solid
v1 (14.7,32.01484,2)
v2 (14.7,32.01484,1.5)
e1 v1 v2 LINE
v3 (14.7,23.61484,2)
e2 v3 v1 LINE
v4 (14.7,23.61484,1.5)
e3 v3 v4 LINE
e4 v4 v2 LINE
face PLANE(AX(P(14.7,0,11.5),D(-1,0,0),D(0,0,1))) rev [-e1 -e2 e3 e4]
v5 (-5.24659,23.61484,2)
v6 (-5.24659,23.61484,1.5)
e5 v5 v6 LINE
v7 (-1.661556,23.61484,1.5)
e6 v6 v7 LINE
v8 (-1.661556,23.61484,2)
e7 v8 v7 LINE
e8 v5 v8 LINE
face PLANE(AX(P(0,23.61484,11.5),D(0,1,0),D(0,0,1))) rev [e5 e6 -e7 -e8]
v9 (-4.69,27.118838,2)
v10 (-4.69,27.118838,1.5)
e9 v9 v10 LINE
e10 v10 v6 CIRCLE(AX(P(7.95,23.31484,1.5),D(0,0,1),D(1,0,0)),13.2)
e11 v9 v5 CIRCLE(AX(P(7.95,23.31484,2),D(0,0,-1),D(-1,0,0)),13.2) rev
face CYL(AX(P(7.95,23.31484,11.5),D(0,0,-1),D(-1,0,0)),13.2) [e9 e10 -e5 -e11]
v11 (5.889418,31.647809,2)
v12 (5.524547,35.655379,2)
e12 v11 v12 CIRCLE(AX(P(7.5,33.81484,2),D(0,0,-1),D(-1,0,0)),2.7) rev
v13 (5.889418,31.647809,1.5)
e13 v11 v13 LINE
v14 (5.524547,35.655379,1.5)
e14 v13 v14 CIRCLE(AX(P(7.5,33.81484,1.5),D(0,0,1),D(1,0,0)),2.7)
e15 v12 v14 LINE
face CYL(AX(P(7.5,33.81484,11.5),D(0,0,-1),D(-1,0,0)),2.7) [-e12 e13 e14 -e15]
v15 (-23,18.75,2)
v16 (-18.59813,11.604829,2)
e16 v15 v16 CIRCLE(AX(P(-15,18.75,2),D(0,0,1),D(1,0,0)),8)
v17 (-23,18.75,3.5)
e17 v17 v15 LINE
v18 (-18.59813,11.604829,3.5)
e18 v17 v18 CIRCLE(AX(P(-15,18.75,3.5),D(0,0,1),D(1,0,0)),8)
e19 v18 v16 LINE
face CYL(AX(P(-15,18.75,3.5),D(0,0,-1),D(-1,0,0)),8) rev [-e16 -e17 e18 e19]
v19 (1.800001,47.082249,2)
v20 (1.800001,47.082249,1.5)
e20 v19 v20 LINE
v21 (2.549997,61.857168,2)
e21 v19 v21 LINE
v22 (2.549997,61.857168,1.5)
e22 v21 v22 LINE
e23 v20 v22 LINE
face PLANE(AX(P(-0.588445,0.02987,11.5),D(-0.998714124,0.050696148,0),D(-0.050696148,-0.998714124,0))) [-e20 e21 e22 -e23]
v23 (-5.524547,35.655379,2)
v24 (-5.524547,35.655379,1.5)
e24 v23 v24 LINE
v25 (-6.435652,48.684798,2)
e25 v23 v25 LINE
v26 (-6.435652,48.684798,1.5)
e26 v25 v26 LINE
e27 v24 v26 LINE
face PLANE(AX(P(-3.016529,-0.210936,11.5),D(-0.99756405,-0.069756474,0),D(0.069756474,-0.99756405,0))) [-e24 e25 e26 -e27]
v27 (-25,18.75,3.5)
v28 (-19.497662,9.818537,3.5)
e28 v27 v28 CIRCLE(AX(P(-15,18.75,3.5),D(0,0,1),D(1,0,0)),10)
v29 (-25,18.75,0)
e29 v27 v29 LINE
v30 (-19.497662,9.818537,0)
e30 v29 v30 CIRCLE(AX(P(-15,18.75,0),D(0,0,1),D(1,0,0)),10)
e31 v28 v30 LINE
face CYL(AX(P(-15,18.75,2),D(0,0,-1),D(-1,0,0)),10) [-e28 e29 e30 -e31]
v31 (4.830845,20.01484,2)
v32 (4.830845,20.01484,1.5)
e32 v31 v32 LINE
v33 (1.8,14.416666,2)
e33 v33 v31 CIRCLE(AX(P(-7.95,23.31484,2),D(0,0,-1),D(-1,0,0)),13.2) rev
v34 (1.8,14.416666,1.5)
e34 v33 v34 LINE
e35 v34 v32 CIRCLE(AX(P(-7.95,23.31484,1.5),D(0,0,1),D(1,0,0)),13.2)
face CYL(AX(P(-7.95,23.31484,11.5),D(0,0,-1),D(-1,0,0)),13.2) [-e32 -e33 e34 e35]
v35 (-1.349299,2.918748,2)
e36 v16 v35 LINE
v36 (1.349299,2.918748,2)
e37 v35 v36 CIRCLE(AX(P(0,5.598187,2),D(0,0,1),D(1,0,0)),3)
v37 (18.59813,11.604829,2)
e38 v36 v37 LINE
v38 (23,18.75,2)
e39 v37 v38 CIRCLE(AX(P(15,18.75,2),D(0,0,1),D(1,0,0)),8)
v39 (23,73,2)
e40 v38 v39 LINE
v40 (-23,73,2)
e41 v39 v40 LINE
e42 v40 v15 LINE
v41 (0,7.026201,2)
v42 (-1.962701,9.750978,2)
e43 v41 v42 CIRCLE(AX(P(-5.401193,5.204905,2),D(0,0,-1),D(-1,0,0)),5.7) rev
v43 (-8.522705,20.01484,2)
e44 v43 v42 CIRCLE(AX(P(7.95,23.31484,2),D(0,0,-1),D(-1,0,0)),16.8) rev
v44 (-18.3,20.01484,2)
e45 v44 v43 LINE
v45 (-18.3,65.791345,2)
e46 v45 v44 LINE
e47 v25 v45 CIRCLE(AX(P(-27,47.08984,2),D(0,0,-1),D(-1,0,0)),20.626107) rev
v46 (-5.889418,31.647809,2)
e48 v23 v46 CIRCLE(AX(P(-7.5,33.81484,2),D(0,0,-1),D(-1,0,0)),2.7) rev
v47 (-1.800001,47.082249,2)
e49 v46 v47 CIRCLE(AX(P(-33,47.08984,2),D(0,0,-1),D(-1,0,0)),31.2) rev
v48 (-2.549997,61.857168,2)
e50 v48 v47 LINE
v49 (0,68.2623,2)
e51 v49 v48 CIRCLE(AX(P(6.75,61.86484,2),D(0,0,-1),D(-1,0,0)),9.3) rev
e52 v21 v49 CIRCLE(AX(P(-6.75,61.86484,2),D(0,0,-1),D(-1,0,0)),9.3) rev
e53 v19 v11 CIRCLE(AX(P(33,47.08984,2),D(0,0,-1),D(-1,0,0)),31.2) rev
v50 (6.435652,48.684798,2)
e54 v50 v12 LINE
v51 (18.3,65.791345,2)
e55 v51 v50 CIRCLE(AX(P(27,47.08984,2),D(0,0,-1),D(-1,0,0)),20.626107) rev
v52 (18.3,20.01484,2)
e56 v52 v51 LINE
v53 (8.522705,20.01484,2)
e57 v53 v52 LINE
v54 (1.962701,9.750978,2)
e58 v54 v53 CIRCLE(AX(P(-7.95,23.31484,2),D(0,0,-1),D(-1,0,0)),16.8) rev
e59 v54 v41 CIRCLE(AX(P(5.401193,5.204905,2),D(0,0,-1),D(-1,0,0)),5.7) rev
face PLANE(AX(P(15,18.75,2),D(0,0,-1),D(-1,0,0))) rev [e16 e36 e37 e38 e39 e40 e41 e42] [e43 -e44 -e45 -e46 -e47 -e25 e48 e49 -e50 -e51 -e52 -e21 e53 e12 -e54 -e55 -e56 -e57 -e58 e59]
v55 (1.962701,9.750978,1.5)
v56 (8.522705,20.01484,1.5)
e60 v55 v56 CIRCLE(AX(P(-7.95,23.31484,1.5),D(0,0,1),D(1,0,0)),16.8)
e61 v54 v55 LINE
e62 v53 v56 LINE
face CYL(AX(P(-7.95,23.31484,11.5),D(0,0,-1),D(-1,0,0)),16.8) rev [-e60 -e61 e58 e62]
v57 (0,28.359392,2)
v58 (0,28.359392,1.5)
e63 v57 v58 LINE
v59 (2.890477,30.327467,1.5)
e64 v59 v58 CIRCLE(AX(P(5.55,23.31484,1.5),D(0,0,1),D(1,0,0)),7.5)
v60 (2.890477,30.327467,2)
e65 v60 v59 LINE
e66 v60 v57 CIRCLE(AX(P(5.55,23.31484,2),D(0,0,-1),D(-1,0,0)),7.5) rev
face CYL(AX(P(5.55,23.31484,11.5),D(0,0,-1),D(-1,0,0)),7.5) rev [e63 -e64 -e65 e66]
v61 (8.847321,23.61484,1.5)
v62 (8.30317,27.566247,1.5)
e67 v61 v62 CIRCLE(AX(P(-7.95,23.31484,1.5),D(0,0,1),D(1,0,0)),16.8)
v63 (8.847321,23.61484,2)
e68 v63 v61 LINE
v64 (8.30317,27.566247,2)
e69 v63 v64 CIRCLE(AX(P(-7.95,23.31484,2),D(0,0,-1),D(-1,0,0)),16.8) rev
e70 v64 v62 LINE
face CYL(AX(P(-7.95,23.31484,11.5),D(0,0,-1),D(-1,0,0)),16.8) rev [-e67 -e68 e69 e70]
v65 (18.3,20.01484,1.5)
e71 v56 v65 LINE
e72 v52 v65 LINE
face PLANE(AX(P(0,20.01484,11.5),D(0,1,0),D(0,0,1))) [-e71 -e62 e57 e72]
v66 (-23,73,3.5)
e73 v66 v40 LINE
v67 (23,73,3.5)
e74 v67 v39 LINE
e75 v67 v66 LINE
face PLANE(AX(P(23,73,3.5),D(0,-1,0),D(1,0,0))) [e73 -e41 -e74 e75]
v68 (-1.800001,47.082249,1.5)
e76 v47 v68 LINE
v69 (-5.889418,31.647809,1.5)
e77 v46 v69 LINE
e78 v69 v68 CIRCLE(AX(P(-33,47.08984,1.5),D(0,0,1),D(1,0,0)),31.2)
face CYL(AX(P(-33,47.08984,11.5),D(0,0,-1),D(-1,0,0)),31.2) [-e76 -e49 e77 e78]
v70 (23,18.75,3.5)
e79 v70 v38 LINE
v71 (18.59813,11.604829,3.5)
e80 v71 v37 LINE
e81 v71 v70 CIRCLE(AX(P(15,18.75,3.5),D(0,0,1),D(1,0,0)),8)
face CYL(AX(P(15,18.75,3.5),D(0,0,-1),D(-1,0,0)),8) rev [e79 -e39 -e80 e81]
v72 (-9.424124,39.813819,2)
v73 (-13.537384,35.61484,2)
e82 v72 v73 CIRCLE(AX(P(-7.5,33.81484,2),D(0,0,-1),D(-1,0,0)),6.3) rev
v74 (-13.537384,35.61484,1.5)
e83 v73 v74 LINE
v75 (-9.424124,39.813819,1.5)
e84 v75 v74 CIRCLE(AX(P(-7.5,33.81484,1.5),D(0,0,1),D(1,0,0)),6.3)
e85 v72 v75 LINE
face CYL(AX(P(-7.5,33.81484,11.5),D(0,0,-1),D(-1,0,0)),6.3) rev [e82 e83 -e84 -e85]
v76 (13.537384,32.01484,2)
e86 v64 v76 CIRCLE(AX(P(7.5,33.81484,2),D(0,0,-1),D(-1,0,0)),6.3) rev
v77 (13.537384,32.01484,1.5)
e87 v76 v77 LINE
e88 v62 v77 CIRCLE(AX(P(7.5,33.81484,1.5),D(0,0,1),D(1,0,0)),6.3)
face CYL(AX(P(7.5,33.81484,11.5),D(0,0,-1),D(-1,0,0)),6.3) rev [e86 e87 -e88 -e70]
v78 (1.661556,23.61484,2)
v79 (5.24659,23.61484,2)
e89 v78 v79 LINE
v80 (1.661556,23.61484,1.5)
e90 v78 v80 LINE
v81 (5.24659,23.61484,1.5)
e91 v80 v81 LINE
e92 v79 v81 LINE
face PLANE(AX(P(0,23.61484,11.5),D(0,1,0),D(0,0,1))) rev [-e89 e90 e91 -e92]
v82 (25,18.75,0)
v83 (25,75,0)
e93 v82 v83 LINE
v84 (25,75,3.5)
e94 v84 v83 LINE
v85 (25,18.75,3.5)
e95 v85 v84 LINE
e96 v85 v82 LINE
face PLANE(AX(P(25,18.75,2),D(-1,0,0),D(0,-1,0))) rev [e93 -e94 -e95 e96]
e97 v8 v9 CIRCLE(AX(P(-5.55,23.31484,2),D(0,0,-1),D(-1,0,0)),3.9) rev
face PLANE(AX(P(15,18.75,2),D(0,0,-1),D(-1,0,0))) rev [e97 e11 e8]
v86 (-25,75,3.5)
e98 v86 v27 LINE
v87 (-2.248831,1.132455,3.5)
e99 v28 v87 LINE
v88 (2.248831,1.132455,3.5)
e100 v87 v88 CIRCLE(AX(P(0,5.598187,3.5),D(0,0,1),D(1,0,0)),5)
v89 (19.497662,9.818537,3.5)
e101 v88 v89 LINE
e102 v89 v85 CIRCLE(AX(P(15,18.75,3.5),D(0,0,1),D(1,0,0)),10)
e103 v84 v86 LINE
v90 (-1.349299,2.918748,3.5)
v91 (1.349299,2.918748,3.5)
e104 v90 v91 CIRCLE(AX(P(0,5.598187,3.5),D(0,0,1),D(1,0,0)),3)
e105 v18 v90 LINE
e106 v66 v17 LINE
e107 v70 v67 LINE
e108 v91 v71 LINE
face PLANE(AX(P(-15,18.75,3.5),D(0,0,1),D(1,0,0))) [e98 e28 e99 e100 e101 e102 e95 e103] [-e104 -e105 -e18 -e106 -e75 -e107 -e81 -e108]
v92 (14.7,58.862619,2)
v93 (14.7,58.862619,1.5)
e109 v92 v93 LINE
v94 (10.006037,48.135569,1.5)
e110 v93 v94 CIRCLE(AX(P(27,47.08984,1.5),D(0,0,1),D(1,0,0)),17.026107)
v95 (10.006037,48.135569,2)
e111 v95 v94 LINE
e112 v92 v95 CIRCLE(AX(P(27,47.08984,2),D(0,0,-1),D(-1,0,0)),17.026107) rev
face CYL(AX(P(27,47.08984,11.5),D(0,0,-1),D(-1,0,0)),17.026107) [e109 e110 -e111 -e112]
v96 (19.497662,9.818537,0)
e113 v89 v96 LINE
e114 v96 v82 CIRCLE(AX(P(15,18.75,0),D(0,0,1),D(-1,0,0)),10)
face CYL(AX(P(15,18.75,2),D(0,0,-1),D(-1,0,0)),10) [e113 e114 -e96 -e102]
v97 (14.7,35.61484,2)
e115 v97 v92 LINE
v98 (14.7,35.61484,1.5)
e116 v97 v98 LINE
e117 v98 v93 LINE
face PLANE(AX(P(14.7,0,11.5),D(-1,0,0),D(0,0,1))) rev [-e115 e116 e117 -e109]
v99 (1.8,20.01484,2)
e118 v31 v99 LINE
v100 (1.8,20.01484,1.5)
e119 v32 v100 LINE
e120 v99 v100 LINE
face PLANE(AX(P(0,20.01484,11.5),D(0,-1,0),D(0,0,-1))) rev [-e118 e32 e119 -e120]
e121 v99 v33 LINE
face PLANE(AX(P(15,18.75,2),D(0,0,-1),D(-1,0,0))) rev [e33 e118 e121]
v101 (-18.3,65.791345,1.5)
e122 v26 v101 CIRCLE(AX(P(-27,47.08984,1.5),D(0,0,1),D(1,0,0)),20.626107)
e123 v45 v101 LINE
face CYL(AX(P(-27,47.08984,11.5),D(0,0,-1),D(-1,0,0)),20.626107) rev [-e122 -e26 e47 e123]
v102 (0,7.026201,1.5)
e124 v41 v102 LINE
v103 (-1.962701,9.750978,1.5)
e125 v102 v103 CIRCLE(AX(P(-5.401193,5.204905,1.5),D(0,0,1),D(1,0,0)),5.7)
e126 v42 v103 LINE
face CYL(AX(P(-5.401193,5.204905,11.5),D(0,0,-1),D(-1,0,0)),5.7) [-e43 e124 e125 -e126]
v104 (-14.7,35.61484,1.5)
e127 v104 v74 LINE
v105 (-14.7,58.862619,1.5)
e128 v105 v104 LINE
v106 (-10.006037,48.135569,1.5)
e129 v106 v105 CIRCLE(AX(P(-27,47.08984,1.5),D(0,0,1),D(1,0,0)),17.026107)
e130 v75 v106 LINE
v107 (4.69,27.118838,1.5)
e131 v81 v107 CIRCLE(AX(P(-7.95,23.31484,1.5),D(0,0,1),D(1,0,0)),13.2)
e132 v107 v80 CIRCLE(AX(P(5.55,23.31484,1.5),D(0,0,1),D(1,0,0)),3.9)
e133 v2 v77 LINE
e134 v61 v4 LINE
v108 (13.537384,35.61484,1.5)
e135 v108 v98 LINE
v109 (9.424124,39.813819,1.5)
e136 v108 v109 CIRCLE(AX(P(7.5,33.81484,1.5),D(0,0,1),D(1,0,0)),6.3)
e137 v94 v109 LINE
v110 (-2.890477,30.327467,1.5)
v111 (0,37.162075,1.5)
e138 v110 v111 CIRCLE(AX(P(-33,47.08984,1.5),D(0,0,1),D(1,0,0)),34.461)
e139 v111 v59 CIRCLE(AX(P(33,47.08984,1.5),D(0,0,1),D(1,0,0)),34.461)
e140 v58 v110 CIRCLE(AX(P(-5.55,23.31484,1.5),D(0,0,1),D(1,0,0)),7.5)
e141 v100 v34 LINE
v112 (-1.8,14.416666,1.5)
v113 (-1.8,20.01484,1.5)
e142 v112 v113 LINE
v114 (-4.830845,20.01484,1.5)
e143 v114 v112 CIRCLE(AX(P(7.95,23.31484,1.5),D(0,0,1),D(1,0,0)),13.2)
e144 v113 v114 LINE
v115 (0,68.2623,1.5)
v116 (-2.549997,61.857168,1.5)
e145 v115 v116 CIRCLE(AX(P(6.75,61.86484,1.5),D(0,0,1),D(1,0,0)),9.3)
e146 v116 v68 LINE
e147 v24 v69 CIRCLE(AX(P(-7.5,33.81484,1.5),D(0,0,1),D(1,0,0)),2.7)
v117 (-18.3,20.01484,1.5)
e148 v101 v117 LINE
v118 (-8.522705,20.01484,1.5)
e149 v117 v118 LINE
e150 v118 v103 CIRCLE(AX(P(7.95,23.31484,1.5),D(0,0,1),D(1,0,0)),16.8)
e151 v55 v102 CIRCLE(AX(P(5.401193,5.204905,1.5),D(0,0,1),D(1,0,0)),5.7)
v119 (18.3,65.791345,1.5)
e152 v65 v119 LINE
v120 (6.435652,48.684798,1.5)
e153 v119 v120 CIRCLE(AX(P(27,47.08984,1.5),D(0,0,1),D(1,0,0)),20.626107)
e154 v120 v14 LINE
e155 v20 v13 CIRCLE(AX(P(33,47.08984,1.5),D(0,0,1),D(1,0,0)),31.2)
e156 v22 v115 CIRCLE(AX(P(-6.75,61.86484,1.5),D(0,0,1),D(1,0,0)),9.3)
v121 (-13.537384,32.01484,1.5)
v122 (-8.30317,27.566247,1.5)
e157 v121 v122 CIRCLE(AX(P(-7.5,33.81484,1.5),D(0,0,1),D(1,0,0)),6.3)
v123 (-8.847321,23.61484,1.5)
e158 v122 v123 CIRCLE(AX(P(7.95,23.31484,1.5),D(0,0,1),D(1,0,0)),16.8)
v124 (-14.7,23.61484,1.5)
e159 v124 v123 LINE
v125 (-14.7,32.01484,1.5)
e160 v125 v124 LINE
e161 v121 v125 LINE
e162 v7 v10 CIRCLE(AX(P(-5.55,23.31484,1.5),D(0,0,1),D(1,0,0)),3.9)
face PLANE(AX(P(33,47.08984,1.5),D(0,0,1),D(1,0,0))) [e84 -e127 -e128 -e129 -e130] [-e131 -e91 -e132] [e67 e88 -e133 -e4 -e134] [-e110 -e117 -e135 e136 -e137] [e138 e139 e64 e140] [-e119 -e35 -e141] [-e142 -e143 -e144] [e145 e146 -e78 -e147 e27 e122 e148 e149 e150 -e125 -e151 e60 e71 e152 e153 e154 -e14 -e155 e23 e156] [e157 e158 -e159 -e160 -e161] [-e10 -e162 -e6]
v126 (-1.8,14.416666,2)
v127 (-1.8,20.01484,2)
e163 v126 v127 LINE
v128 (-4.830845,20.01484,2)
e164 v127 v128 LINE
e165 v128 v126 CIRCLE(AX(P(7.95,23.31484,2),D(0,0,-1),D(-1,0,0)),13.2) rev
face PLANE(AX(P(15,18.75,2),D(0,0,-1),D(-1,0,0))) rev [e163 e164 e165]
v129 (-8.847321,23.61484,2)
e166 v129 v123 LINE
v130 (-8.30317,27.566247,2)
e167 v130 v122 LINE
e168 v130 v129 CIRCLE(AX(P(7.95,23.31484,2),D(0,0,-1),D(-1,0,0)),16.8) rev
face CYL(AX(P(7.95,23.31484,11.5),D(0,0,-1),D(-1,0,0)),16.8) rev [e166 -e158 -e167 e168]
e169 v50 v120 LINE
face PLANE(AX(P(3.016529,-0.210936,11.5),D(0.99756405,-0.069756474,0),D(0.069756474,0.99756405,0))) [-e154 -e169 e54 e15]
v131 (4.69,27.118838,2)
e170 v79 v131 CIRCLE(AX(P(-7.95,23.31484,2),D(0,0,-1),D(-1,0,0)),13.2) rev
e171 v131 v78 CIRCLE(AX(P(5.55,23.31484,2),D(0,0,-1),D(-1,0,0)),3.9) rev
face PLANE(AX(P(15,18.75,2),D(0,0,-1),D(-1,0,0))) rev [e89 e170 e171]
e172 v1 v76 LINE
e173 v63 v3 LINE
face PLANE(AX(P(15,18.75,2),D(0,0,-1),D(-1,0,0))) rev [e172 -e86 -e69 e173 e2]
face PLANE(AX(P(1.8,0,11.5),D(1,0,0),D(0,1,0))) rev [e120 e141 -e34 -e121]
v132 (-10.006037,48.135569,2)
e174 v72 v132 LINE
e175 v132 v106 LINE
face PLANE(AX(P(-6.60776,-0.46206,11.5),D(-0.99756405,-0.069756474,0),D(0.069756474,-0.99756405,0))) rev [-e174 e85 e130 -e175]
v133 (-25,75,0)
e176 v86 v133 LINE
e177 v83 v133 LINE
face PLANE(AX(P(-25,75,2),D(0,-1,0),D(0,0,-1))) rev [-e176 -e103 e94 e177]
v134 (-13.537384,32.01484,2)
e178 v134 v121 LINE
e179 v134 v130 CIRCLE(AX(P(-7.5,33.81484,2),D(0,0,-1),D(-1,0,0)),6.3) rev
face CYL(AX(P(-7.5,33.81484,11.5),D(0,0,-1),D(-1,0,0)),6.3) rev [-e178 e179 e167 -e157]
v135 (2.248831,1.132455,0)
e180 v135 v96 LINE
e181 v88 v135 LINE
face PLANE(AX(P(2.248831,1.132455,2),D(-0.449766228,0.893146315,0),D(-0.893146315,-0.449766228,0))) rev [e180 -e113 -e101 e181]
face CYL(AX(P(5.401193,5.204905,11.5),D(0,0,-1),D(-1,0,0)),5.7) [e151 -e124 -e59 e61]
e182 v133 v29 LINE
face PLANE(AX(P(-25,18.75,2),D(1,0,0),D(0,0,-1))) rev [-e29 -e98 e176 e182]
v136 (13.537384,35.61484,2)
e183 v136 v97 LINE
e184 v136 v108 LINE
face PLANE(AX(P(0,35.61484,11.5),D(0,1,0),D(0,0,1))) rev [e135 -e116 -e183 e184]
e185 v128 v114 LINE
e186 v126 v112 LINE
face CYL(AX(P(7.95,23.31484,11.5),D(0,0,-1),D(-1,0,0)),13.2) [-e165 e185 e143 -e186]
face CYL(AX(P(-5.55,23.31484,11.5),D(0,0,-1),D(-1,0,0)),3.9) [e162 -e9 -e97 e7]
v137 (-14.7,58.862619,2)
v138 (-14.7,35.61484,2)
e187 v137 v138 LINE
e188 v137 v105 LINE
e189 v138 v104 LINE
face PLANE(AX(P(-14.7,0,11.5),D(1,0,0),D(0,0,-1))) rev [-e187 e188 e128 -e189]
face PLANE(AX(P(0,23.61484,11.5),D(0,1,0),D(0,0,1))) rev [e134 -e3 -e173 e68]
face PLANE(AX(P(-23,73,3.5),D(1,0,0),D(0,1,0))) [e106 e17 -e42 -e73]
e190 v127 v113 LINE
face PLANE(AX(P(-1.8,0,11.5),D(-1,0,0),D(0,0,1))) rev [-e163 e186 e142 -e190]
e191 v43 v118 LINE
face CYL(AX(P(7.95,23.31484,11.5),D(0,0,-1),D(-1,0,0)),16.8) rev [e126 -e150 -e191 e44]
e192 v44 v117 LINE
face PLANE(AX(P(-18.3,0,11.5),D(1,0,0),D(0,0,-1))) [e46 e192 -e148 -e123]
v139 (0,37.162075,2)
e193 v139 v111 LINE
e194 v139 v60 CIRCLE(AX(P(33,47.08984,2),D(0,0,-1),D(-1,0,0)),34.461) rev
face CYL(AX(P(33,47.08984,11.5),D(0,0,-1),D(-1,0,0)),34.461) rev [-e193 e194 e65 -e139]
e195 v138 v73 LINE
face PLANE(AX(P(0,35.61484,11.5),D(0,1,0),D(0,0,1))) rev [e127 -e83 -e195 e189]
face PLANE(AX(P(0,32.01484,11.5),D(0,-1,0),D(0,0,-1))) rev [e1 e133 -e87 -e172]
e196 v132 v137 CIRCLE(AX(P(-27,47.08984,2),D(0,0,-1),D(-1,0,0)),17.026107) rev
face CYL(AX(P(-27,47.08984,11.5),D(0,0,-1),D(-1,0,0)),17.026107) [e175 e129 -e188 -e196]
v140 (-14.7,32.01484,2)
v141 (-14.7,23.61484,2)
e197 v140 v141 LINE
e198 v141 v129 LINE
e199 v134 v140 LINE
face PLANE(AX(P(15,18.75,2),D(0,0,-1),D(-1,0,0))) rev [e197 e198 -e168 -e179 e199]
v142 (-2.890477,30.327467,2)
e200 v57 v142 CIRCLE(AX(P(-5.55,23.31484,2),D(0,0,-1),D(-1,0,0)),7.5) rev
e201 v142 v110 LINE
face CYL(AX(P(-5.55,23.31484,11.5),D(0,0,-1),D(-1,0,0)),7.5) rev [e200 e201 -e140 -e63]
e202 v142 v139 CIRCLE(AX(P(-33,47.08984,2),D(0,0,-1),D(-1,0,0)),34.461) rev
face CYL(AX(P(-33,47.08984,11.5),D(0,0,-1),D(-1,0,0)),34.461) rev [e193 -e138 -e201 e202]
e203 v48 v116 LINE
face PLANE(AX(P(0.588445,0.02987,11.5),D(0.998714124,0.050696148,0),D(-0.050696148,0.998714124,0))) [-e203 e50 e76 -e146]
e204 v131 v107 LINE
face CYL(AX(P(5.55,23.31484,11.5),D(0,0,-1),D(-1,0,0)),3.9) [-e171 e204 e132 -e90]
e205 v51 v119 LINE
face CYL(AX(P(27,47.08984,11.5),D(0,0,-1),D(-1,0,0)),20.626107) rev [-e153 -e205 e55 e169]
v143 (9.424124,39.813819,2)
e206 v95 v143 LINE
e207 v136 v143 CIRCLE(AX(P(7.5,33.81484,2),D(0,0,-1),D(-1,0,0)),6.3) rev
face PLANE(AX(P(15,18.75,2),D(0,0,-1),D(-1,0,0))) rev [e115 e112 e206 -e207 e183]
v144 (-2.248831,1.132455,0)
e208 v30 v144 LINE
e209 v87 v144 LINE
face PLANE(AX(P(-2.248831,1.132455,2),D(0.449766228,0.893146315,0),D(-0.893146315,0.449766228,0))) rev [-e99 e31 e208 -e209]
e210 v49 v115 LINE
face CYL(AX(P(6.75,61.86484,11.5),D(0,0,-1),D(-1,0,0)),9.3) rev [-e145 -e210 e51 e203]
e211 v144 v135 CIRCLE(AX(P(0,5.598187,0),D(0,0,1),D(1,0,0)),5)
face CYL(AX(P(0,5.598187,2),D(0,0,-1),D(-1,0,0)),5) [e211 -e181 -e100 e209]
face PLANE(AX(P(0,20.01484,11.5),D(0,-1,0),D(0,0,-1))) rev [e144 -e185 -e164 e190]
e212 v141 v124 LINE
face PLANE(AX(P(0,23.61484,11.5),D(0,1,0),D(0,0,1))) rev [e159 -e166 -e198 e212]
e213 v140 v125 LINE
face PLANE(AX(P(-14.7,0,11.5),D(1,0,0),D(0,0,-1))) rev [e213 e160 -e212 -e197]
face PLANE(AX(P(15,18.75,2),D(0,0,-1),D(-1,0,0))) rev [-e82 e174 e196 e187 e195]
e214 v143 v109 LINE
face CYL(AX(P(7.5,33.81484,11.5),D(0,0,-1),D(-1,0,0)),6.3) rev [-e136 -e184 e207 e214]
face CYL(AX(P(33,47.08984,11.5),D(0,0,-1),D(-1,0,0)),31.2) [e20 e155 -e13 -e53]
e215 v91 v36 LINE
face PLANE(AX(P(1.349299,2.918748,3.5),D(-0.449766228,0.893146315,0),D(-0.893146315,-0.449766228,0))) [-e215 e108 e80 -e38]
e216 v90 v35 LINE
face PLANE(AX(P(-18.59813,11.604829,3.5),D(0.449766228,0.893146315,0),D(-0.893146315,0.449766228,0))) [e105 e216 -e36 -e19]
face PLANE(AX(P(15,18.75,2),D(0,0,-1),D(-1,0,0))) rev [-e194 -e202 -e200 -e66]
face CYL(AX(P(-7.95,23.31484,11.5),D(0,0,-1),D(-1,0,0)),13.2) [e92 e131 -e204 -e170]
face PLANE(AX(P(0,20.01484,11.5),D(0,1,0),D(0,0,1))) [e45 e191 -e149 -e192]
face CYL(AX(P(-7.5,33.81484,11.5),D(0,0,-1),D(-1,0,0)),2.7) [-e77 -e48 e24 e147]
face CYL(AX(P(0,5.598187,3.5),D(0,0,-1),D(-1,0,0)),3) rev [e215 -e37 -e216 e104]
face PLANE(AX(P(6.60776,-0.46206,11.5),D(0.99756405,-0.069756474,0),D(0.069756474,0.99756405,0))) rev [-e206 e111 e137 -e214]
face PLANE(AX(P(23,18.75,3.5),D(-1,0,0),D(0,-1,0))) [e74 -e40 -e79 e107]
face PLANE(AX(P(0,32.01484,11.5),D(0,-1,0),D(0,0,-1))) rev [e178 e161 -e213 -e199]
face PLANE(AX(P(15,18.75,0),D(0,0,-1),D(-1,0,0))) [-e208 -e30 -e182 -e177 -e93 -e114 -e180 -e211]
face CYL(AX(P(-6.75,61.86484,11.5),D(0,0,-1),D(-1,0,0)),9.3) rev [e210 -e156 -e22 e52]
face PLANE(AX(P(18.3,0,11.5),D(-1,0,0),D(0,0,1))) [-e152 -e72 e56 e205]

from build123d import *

# Parameters (mm, degrees)
EXTRUDE_1_DEPTH     = 2
EXTRUDE_2_DEPTH     = 1.5
OTHER_START         = 1.5
OTHER_1_DEPTH       = 0.5
CUT_EXTRUDE_1_DEPTH = 10


# Read off the part's stored shape, not the designer's step: Полость1
with BuildPart() as part:
    # Эскиз1 → Бобышка-Вытянуть1 (new body)
    with BuildSketch(Plane.XY):
        with BuildLine():
            Line((-2.248831138, 1.132455321), (-19.497662275, 9.818536847))
            ThreePointArc((-19.497662275, 9.818536847), (-23.514006776, 13.504841411), (-25, 18.75))
            Line((-25, 18.75), (-25, 75))
            Line((-25, 75), (25, 75))
            Line((25, 75), (25, 18.75))
            ThreePointArc((25, 18.75), (23.514006776, 13.504841411), (19.497662275, 9.818536847))
            Line((19.497662275, 9.818536847), (2.248831138, 1.132455321))
            ThreePointArc((2.248831138, 1.132455321), (0, 0.598186897), (-2.248831138, 1.132455321))
        make_face()
    extrude(amount=EXTRUDE_1_DEPTH)

    # Эскиз2 → Бобышка-Вытянуть2 (add)
    with BuildSketch(Plane.XY.offset(2)):
        with BuildLine():
            Line((25, 75), (-25, 75))
            Line((-25, 75), (-25, 18.75))
            ThreePointArc((-25, 18.75), (-23.514006776, 13.504841411), (-19.497662275, 9.818536847))
            Line((-19.497662275, 9.818536847), (-2.248831138, 1.132455321))
            ThreePointArc((-2.248831138, 1.132455321), (0, 0.598186897), (2.248831138, 1.132455321))
            Line((2.248831138, 1.132455321), (19.497662275, 9.818536847))
            ThreePointArc((19.497662275, 9.818536847), (23.514006776, 13.504841411), (25, 18.75))
            Line((25, 18.75), (25, 75))
        make_face()
        with BuildLine():
            Line((23, 73), (-23, 73))
            Line((-23, 73), (-23, 18.75))
            ThreePointArc((-23, 18.75), (-21.81120542, 14.553873129), (-18.59812982, 11.604829477))
            Line((-18.59812982, 11.604829477), (-1.349298683, 2.918747951))
            ThreePointArc((-1.349298683, 2.918747951), (0, 2.598186897), (1.349298683, 2.918747951))
            Line((1.349298683, 2.918747951), (18.59812982, 11.604829477))
            ThreePointArc((18.59812982, 11.604829477), (21.81120542, 14.553873129), (23, 18.75))
            Line((23, 18.75), (23, 73))
        make_face(mode=Mode.SUBTRACT)
    extrude(amount=EXTRUDE_2_DEPTH)

    # Полость1 outline → Полость1 (cut)
    with BuildSketch(Plane.XY.offset(OTHER_START)):
        with BuildLine():
            ThreePointArc((5.872817683, 36.335212556), (10.497140141, 33.683878279), (5.659180925, 31.446003782))
            ThreePointArc((5.659180925, 31.446003782), (2.557547726, 38.996194393), (1.5, 47.089840022))
            Line((1.5, 47.089840022), (2.25, 61.864840022))
            ThreePointArc((2.25, 61.864840022), (1.66872912, 65.046820537), (0, 67.817780472))
            ThreePointArc((0, 67.817780472), (-1.66872912, 65.046820537), (-2.25, 61.864840022))
            Line((-2.25, 61.864840022), (-1.5, 47.089840022))
            ThreePointArc((-1.5, 47.089840022), (-2.557547726, 38.996194393), (-5.659180925, 31.446003782))
            ThreePointArc((-5.659180925, 31.446003782), (-10.49714014, 33.683878279), (-5.872817683, 36.335212556))
            Line((-5.872817683, 36.335212556), (-6.73484174, 48.66273089))
            ThreePointArc((-6.73484174, 48.66273089), (-10.164455559, 58.47909234), (-18, 65.314840022))
            Line((-18, 65.314840022), (-18, 20.314840022))
            Line((-18, 20.314840022), (-8.27498074, 20.314840022))
            ThreePointArc((-8.27498074, 20.314840022), (-6.018005307, 14.531627185), (-1.78373039, 9.991758821))
            ThreePointArc((-1.78373039, 9.991758821), (-0.762703724, 9.010745514), (0, 7.817780472))
            ThreePointArc((0, 7.817780472), (0.762703724, 9.010745514), (1.78373039, 9.991758821))
            ThreePointArc((1.78373039, 9.991758821), (6.018005307, 14.531627185), (8.27498074, 20.314840022))
            Line((8.27498074, 20.314840022), (18, 20.314840022))
            Line((18, 20.314840022), (18, 65.314840022))
            ThreePointArc((18, 65.314840022), (10.164455559, 58.47909234), (6.73484174, 48.66273089))
            Line((6.73484174, 48.66273089), (5.872817683, 36.335212556))
        make_face()
        with BuildLine():
            ThreePointArc((-1.5, 13.673911644), (-3.833724688, 16.727440499), (-5.212446581, 20.314840022))
            Line((-5.212446581, 20.314840022), (-1.5, 20.314840022))
            Line((-1.5, 20.314840022), (-1.5, 13.673911644))
        make_face(mode=Mode.SUBTRACT)
        with BuildLine():
            ThreePointArc((-7.92032189, 27.82958067), (-8.391822285, 25.594060154), (-8.55, 23.314840022))
            Line((-8.55, 23.314840022), (-15, 23.314840022))
            Line((-15, 23.314840022), (-15, 32.314840022))
            Line((-15, 32.314840022), (-13.309475019, 32.314840022))
            ThreePointArc((-13.309475019, 32.314840022), (-11.338226185, 29.203113691), (-7.92032189, 27.82958067))
        make_face(mode=Mode.SUBTRACT)
        with BuildLine():
            ThreePointArc((-4.896666667, 27.463714033), (-2.35750881, 26.043942439), (-1.35, 23.314840022))
            Line((-1.35, 23.314840022), (-5.55, 23.314840022))
            ThreePointArc((-5.55, 23.314840022), (-5.385666463, 25.414840022), (-4.896666667, 27.463714033))
        make_face(mode=Mode.SUBTRACT)
        with BuildLine():
            Line((1.5, 13.673911644), (1.5, 20.314840022))
            Line((1.5, 20.314840022), (5.212446581, 20.314840022))
            ThreePointArc((5.212446581, 20.314840022), (3.833724688, 16.727440499), (1.5, 13.673911644))
        make_face(mode=Mode.SUBTRACT)
        with BuildLine():
            ThreePointArc((1.35, 23.314840022), (2.35750881, 26.043942439), (4.896666667, 27.463714033))
            ThreePointArc((4.896666667, 27.463714033), (5.385666463, 25.414840022), (5.55, 23.314840022))
            Line((5.55, 23.314840022), (1.35, 23.314840022))
        make_face(mode=Mode.SUBTRACT)
        with BuildLine():
            ThreePointArc((0, 38.259555712), (1.403302974, 34.104361284), (3.327405339, 30.163202817))
            ThreePointArc((3.327405339, 30.163202817), (1.502516133, 29.26949151), (0, 27.901505478))
            ThreePointArc((0, 27.901505478), (-1.502516133, 29.26949151), (-3.327405339, 30.163202817))
            ThreePointArc((-3.327405339, 30.163202817), (-1.403302974, 34.104361284), (0, 38.259555712))
        make_face(mode=Mode.SUBTRACT)
        with BuildLine():
            ThreePointArc((8.55, 23.314840022), (8.391822285, 25.594060154), (7.92032189, 27.82958067))
            ThreePointArc((7.92032189, 27.82958067), (11.338226185, 29.203113691), (13.309475019, 32.314840022))
            Line((13.309475019, 32.314840022), (15, 32.314840022))
            Line((15, 32.314840022), (15, 23.314840022))
            Line((15, 23.314840022), (8.55, 23.314840022))
        make_face(mode=Mode.SUBTRACT)
        with BuildLine():
            ThreePointArc((-9.108112452, 39.595322211), (-11.782030233, 38.017722019), (-13.309475019, 35.314840022))
            Line((-13.309475019, 35.314840022), (-15, 35.314840022))
            Line((-15, 35.314840022), (-15, 59.587599146))
            ThreePointArc((-15, 59.587599146), (-11.277427711, 54.369586152), (-9.706680997, 48.155251207))
            Line((-9.706680997, 48.155251207), (-9.108112452, 39.595322211))
        make_face(mode=Mode.SUBTRACT)
        with BuildLine():
            ThreePointArc((9.706680998, 48.155251207), (11.277427711, 54.369586152), (15, 59.587599146))
            Line((15, 59.587599146), (15, 35.314840022))
            Line((15, 35.314840022), (13.309475019, 35.314840022))
            ThreePointArc((13.309475019, 35.314840022), (11.782030233, 38.017722019), (9.108112452, 39.595322211))
            Line((9.108112452, 39.595322211), (9.706680998, 48.155251207))
        make_face(mode=Mode.SUBTRACT)
    extrude(amount=OTHER_1_DEPTH, mode=Mode.SUBTRACT)

    # Эскиз3 → Вырез-Вытянуть1 (cut)
    with BuildSketch(Plane.XY.offset(1.5)):
        with BuildLine():
            Line((-18.3, 65.79134502), (-18.3, 20.014840022))
            Line((-18.3, 20.014840022), (-8.522704696, 20.014840022))
            ThreePointArc((-8.522704696, 20.014840022), (-6.205709985, 14.267416366), (-1.962700971, 9.75097776))
            ThreePointArc((-1.962700971, 9.75097776), (-0.776140503, 8.53640523), (0, 7.026200576))
            ThreePointArc((0, 7.026200576), (0.776140503, 8.53640523), (1.962700971, 9.75097776))
            ThreePointArc((1.962700971, 9.75097776), (6.205709985, 14.267416366), (8.522704696, 20.014840022))
            Line((8.522704696, 20.014840022), (18.3, 20.014840022))
            Line((18.3, 20.014840022), (18.3, 65.79134502))
            ThreePointArc((18.3, 65.79134502), (10.051283209, 58.844723617), (6.435652247, 48.684797911))
            Line((6.435652247, 48.684797911), (5.524546517, 35.655378948))
            ThreePointArc((5.524546517, 35.655378948), (10.188878559, 34.059650346), (5.889417806, 31.647808643))
            ThreePointArc((5.889417806, 31.647808643), (2.840648904, 39.098998924), (1.800000924, 47.0822489))
            Line((1.800000924, 47.0822489), (2.549996836, 61.857168373))
            ThreePointArc((2.549996836, 61.857168373), (1.8904299, 65.304748617), (0, 68.262300456))
            ThreePointArc((0, 68.262300456), (-1.8904299, 65.304748617), (-2.549996836, 61.857168373))
            Line((-2.549996836, 61.857168373), (-1.800000923, 47.0822489))
            ThreePointArc((-1.800000923, 47.0822489), (-2.840648904, 39.098998924), (-5.889417806, 31.647808643))
            ThreePointArc((-5.889417806, 31.647808643), (-10.188878559, 34.059650346), (-5.524546517, 35.655378948))
            Line((-5.524546517, 35.655378948), (-6.435652247, 48.684797911))
            ThreePointArc((-6.435652247, 48.684797911), (-10.051283209, 58.844723617), (-18.3, 65.79134502))
        make_face()
        with BuildLine():
            Line((-14.7, 58.862618748), (-14.7, 35.614840022))
            Line((-14.7, 35.614840022), (-13.537383539, 35.614840022))
            ThreePointArc((-13.537383539, 35.614840022), (-12.000472829, 38.223438928), (-9.424123799, 39.813818902))
            Line((-9.424123799, 39.813818902), (-10.006037257, 48.13556906))
            ThreePointArc((-10.006037257, 48.13556906), (-11.401876329, 53.915296555), (-14.7, 58.862618748))
        make_face(mode=Mode.SUBTRACT)
        with BuildLine():
            Line((10.006037257, 48.13556906), (9.424123799, 39.813818902))
            ThreePointArc((9.424123799, 39.813818902), (12.000472829, 38.223438928), (13.537383539, 35.614840022))
            Line((13.537383539, 35.614840022), (14.7, 35.614840022))
            Line((14.7, 35.614840022), (14.7, 58.862618748))
            ThreePointArc((14.7, 58.862618748), (11.401876329, 53.915296555), (10.006037257, 48.13556906))
        make_face(mode=Mode.SUBTRACT)
        with BuildLine():
            Line((8.847321215, 23.614840022), (14.7, 23.614840022))
            Line((14.7, 23.614840022), (14.7, 32.014840022))
            Line((14.7, 32.014840022), (13.537383539, 32.014840022))
            ThreePointArc((13.537383539, 32.014840022), (11.579925154, 29.014401424), (8.303170174, 27.566246767))
            ThreePointArc((8.303170174, 27.566246767), (8.692930904, 25.606749909), (8.847321215, 23.614840022))
        make_face(mode=Mode.SUBTRACT)
        with BuildLine():
            Line((-5.246590469, 23.614840022), (-1.661555581, 23.614840022))
            ThreePointArc((-1.661555581, 23.614840022), (-2.599333734, 25.86504954), (-4.69, 27.118837919))
            ThreePointArc((-4.69, 27.118837919), (-5.086558291, 25.385624396), (-5.246590469, 23.614840022))
        make_face(mode=Mode.SUBTRACT)
        with BuildLine():
            Line((1.661555581, 23.614840022), (5.246590469, 23.614840022))
            ThreePointArc((5.246590469, 23.614840022), (5.086558291, 25.385624396), (4.69, 27.118837919))
            ThreePointArc((4.69, 27.118837919), (2.599333734, 25.86504954), (1.661555581, 23.614840022))
        make_face(mode=Mode.SUBTRACT)
        with BuildLine():
            Line((-1.8, 20.014840022), (-4.830845042, 20.014840022))
            ThreePointArc((-4.830845042, 20.014840022), (-3.657955571, 17.030306032), (-1.8, 14.416666052))
            Line((-1.8, 14.416666052), (-1.8, 20.014840022))
        make_face(mode=Mode.SUBTRACT)
        with BuildLine():
            Line((4.830845043, 20.014840022), (1.8, 20.014840022))
            Line((1.8, 20.014840022), (1.8, 14.416666052))
            ThreePointArc((1.8, 14.416666052), (3.657955571, 17.030306032), (4.830845043, 20.014840022))
        make_face(mode=Mode.SUBTRACT)
        with BuildLine():
            Line((-13.537383539, 32.014840022), (-14.7, 32.014840022))
            Line((-14.7, 32.014840022), (-14.7, 23.614840022))
            Line((-14.7, 23.614840022), (-8.847321215, 23.614840022))
            ThreePointArc((-8.847321215, 23.614840022), (-8.692930904, 25.606749909), (-8.303170174, 27.566246767))
            ThreePointArc((-8.303170174, 27.566246767), (-11.579925154, 29.014401424), (-13.537383539, 32.014840022))
        make_face(mode=Mode.SUBTRACT)
        with BuildLine():
            ThreePointArc((2.89047704, 30.327467035), (1.328934128, 29.514243453), (0, 28.359391538))
            ThreePointArc((0, 28.359391538), (-1.328934128, 29.514243453), (-2.89047704, 30.327467035))
            ThreePointArc((-2.89047704, 30.327467035), (-1.260735073, 33.666741166), (0, 37.162074866))
            ThreePointArc((0, 37.162074866), (1.260735073, 33.666741166), (2.89047704, 30.327467035))
        make_face(mode=Mode.SUBTRACT)
    extrude(amount=CUT_EXTRUDE_1_DEPTH, mode=Mode.SUBTRACT)


solid = part.part
